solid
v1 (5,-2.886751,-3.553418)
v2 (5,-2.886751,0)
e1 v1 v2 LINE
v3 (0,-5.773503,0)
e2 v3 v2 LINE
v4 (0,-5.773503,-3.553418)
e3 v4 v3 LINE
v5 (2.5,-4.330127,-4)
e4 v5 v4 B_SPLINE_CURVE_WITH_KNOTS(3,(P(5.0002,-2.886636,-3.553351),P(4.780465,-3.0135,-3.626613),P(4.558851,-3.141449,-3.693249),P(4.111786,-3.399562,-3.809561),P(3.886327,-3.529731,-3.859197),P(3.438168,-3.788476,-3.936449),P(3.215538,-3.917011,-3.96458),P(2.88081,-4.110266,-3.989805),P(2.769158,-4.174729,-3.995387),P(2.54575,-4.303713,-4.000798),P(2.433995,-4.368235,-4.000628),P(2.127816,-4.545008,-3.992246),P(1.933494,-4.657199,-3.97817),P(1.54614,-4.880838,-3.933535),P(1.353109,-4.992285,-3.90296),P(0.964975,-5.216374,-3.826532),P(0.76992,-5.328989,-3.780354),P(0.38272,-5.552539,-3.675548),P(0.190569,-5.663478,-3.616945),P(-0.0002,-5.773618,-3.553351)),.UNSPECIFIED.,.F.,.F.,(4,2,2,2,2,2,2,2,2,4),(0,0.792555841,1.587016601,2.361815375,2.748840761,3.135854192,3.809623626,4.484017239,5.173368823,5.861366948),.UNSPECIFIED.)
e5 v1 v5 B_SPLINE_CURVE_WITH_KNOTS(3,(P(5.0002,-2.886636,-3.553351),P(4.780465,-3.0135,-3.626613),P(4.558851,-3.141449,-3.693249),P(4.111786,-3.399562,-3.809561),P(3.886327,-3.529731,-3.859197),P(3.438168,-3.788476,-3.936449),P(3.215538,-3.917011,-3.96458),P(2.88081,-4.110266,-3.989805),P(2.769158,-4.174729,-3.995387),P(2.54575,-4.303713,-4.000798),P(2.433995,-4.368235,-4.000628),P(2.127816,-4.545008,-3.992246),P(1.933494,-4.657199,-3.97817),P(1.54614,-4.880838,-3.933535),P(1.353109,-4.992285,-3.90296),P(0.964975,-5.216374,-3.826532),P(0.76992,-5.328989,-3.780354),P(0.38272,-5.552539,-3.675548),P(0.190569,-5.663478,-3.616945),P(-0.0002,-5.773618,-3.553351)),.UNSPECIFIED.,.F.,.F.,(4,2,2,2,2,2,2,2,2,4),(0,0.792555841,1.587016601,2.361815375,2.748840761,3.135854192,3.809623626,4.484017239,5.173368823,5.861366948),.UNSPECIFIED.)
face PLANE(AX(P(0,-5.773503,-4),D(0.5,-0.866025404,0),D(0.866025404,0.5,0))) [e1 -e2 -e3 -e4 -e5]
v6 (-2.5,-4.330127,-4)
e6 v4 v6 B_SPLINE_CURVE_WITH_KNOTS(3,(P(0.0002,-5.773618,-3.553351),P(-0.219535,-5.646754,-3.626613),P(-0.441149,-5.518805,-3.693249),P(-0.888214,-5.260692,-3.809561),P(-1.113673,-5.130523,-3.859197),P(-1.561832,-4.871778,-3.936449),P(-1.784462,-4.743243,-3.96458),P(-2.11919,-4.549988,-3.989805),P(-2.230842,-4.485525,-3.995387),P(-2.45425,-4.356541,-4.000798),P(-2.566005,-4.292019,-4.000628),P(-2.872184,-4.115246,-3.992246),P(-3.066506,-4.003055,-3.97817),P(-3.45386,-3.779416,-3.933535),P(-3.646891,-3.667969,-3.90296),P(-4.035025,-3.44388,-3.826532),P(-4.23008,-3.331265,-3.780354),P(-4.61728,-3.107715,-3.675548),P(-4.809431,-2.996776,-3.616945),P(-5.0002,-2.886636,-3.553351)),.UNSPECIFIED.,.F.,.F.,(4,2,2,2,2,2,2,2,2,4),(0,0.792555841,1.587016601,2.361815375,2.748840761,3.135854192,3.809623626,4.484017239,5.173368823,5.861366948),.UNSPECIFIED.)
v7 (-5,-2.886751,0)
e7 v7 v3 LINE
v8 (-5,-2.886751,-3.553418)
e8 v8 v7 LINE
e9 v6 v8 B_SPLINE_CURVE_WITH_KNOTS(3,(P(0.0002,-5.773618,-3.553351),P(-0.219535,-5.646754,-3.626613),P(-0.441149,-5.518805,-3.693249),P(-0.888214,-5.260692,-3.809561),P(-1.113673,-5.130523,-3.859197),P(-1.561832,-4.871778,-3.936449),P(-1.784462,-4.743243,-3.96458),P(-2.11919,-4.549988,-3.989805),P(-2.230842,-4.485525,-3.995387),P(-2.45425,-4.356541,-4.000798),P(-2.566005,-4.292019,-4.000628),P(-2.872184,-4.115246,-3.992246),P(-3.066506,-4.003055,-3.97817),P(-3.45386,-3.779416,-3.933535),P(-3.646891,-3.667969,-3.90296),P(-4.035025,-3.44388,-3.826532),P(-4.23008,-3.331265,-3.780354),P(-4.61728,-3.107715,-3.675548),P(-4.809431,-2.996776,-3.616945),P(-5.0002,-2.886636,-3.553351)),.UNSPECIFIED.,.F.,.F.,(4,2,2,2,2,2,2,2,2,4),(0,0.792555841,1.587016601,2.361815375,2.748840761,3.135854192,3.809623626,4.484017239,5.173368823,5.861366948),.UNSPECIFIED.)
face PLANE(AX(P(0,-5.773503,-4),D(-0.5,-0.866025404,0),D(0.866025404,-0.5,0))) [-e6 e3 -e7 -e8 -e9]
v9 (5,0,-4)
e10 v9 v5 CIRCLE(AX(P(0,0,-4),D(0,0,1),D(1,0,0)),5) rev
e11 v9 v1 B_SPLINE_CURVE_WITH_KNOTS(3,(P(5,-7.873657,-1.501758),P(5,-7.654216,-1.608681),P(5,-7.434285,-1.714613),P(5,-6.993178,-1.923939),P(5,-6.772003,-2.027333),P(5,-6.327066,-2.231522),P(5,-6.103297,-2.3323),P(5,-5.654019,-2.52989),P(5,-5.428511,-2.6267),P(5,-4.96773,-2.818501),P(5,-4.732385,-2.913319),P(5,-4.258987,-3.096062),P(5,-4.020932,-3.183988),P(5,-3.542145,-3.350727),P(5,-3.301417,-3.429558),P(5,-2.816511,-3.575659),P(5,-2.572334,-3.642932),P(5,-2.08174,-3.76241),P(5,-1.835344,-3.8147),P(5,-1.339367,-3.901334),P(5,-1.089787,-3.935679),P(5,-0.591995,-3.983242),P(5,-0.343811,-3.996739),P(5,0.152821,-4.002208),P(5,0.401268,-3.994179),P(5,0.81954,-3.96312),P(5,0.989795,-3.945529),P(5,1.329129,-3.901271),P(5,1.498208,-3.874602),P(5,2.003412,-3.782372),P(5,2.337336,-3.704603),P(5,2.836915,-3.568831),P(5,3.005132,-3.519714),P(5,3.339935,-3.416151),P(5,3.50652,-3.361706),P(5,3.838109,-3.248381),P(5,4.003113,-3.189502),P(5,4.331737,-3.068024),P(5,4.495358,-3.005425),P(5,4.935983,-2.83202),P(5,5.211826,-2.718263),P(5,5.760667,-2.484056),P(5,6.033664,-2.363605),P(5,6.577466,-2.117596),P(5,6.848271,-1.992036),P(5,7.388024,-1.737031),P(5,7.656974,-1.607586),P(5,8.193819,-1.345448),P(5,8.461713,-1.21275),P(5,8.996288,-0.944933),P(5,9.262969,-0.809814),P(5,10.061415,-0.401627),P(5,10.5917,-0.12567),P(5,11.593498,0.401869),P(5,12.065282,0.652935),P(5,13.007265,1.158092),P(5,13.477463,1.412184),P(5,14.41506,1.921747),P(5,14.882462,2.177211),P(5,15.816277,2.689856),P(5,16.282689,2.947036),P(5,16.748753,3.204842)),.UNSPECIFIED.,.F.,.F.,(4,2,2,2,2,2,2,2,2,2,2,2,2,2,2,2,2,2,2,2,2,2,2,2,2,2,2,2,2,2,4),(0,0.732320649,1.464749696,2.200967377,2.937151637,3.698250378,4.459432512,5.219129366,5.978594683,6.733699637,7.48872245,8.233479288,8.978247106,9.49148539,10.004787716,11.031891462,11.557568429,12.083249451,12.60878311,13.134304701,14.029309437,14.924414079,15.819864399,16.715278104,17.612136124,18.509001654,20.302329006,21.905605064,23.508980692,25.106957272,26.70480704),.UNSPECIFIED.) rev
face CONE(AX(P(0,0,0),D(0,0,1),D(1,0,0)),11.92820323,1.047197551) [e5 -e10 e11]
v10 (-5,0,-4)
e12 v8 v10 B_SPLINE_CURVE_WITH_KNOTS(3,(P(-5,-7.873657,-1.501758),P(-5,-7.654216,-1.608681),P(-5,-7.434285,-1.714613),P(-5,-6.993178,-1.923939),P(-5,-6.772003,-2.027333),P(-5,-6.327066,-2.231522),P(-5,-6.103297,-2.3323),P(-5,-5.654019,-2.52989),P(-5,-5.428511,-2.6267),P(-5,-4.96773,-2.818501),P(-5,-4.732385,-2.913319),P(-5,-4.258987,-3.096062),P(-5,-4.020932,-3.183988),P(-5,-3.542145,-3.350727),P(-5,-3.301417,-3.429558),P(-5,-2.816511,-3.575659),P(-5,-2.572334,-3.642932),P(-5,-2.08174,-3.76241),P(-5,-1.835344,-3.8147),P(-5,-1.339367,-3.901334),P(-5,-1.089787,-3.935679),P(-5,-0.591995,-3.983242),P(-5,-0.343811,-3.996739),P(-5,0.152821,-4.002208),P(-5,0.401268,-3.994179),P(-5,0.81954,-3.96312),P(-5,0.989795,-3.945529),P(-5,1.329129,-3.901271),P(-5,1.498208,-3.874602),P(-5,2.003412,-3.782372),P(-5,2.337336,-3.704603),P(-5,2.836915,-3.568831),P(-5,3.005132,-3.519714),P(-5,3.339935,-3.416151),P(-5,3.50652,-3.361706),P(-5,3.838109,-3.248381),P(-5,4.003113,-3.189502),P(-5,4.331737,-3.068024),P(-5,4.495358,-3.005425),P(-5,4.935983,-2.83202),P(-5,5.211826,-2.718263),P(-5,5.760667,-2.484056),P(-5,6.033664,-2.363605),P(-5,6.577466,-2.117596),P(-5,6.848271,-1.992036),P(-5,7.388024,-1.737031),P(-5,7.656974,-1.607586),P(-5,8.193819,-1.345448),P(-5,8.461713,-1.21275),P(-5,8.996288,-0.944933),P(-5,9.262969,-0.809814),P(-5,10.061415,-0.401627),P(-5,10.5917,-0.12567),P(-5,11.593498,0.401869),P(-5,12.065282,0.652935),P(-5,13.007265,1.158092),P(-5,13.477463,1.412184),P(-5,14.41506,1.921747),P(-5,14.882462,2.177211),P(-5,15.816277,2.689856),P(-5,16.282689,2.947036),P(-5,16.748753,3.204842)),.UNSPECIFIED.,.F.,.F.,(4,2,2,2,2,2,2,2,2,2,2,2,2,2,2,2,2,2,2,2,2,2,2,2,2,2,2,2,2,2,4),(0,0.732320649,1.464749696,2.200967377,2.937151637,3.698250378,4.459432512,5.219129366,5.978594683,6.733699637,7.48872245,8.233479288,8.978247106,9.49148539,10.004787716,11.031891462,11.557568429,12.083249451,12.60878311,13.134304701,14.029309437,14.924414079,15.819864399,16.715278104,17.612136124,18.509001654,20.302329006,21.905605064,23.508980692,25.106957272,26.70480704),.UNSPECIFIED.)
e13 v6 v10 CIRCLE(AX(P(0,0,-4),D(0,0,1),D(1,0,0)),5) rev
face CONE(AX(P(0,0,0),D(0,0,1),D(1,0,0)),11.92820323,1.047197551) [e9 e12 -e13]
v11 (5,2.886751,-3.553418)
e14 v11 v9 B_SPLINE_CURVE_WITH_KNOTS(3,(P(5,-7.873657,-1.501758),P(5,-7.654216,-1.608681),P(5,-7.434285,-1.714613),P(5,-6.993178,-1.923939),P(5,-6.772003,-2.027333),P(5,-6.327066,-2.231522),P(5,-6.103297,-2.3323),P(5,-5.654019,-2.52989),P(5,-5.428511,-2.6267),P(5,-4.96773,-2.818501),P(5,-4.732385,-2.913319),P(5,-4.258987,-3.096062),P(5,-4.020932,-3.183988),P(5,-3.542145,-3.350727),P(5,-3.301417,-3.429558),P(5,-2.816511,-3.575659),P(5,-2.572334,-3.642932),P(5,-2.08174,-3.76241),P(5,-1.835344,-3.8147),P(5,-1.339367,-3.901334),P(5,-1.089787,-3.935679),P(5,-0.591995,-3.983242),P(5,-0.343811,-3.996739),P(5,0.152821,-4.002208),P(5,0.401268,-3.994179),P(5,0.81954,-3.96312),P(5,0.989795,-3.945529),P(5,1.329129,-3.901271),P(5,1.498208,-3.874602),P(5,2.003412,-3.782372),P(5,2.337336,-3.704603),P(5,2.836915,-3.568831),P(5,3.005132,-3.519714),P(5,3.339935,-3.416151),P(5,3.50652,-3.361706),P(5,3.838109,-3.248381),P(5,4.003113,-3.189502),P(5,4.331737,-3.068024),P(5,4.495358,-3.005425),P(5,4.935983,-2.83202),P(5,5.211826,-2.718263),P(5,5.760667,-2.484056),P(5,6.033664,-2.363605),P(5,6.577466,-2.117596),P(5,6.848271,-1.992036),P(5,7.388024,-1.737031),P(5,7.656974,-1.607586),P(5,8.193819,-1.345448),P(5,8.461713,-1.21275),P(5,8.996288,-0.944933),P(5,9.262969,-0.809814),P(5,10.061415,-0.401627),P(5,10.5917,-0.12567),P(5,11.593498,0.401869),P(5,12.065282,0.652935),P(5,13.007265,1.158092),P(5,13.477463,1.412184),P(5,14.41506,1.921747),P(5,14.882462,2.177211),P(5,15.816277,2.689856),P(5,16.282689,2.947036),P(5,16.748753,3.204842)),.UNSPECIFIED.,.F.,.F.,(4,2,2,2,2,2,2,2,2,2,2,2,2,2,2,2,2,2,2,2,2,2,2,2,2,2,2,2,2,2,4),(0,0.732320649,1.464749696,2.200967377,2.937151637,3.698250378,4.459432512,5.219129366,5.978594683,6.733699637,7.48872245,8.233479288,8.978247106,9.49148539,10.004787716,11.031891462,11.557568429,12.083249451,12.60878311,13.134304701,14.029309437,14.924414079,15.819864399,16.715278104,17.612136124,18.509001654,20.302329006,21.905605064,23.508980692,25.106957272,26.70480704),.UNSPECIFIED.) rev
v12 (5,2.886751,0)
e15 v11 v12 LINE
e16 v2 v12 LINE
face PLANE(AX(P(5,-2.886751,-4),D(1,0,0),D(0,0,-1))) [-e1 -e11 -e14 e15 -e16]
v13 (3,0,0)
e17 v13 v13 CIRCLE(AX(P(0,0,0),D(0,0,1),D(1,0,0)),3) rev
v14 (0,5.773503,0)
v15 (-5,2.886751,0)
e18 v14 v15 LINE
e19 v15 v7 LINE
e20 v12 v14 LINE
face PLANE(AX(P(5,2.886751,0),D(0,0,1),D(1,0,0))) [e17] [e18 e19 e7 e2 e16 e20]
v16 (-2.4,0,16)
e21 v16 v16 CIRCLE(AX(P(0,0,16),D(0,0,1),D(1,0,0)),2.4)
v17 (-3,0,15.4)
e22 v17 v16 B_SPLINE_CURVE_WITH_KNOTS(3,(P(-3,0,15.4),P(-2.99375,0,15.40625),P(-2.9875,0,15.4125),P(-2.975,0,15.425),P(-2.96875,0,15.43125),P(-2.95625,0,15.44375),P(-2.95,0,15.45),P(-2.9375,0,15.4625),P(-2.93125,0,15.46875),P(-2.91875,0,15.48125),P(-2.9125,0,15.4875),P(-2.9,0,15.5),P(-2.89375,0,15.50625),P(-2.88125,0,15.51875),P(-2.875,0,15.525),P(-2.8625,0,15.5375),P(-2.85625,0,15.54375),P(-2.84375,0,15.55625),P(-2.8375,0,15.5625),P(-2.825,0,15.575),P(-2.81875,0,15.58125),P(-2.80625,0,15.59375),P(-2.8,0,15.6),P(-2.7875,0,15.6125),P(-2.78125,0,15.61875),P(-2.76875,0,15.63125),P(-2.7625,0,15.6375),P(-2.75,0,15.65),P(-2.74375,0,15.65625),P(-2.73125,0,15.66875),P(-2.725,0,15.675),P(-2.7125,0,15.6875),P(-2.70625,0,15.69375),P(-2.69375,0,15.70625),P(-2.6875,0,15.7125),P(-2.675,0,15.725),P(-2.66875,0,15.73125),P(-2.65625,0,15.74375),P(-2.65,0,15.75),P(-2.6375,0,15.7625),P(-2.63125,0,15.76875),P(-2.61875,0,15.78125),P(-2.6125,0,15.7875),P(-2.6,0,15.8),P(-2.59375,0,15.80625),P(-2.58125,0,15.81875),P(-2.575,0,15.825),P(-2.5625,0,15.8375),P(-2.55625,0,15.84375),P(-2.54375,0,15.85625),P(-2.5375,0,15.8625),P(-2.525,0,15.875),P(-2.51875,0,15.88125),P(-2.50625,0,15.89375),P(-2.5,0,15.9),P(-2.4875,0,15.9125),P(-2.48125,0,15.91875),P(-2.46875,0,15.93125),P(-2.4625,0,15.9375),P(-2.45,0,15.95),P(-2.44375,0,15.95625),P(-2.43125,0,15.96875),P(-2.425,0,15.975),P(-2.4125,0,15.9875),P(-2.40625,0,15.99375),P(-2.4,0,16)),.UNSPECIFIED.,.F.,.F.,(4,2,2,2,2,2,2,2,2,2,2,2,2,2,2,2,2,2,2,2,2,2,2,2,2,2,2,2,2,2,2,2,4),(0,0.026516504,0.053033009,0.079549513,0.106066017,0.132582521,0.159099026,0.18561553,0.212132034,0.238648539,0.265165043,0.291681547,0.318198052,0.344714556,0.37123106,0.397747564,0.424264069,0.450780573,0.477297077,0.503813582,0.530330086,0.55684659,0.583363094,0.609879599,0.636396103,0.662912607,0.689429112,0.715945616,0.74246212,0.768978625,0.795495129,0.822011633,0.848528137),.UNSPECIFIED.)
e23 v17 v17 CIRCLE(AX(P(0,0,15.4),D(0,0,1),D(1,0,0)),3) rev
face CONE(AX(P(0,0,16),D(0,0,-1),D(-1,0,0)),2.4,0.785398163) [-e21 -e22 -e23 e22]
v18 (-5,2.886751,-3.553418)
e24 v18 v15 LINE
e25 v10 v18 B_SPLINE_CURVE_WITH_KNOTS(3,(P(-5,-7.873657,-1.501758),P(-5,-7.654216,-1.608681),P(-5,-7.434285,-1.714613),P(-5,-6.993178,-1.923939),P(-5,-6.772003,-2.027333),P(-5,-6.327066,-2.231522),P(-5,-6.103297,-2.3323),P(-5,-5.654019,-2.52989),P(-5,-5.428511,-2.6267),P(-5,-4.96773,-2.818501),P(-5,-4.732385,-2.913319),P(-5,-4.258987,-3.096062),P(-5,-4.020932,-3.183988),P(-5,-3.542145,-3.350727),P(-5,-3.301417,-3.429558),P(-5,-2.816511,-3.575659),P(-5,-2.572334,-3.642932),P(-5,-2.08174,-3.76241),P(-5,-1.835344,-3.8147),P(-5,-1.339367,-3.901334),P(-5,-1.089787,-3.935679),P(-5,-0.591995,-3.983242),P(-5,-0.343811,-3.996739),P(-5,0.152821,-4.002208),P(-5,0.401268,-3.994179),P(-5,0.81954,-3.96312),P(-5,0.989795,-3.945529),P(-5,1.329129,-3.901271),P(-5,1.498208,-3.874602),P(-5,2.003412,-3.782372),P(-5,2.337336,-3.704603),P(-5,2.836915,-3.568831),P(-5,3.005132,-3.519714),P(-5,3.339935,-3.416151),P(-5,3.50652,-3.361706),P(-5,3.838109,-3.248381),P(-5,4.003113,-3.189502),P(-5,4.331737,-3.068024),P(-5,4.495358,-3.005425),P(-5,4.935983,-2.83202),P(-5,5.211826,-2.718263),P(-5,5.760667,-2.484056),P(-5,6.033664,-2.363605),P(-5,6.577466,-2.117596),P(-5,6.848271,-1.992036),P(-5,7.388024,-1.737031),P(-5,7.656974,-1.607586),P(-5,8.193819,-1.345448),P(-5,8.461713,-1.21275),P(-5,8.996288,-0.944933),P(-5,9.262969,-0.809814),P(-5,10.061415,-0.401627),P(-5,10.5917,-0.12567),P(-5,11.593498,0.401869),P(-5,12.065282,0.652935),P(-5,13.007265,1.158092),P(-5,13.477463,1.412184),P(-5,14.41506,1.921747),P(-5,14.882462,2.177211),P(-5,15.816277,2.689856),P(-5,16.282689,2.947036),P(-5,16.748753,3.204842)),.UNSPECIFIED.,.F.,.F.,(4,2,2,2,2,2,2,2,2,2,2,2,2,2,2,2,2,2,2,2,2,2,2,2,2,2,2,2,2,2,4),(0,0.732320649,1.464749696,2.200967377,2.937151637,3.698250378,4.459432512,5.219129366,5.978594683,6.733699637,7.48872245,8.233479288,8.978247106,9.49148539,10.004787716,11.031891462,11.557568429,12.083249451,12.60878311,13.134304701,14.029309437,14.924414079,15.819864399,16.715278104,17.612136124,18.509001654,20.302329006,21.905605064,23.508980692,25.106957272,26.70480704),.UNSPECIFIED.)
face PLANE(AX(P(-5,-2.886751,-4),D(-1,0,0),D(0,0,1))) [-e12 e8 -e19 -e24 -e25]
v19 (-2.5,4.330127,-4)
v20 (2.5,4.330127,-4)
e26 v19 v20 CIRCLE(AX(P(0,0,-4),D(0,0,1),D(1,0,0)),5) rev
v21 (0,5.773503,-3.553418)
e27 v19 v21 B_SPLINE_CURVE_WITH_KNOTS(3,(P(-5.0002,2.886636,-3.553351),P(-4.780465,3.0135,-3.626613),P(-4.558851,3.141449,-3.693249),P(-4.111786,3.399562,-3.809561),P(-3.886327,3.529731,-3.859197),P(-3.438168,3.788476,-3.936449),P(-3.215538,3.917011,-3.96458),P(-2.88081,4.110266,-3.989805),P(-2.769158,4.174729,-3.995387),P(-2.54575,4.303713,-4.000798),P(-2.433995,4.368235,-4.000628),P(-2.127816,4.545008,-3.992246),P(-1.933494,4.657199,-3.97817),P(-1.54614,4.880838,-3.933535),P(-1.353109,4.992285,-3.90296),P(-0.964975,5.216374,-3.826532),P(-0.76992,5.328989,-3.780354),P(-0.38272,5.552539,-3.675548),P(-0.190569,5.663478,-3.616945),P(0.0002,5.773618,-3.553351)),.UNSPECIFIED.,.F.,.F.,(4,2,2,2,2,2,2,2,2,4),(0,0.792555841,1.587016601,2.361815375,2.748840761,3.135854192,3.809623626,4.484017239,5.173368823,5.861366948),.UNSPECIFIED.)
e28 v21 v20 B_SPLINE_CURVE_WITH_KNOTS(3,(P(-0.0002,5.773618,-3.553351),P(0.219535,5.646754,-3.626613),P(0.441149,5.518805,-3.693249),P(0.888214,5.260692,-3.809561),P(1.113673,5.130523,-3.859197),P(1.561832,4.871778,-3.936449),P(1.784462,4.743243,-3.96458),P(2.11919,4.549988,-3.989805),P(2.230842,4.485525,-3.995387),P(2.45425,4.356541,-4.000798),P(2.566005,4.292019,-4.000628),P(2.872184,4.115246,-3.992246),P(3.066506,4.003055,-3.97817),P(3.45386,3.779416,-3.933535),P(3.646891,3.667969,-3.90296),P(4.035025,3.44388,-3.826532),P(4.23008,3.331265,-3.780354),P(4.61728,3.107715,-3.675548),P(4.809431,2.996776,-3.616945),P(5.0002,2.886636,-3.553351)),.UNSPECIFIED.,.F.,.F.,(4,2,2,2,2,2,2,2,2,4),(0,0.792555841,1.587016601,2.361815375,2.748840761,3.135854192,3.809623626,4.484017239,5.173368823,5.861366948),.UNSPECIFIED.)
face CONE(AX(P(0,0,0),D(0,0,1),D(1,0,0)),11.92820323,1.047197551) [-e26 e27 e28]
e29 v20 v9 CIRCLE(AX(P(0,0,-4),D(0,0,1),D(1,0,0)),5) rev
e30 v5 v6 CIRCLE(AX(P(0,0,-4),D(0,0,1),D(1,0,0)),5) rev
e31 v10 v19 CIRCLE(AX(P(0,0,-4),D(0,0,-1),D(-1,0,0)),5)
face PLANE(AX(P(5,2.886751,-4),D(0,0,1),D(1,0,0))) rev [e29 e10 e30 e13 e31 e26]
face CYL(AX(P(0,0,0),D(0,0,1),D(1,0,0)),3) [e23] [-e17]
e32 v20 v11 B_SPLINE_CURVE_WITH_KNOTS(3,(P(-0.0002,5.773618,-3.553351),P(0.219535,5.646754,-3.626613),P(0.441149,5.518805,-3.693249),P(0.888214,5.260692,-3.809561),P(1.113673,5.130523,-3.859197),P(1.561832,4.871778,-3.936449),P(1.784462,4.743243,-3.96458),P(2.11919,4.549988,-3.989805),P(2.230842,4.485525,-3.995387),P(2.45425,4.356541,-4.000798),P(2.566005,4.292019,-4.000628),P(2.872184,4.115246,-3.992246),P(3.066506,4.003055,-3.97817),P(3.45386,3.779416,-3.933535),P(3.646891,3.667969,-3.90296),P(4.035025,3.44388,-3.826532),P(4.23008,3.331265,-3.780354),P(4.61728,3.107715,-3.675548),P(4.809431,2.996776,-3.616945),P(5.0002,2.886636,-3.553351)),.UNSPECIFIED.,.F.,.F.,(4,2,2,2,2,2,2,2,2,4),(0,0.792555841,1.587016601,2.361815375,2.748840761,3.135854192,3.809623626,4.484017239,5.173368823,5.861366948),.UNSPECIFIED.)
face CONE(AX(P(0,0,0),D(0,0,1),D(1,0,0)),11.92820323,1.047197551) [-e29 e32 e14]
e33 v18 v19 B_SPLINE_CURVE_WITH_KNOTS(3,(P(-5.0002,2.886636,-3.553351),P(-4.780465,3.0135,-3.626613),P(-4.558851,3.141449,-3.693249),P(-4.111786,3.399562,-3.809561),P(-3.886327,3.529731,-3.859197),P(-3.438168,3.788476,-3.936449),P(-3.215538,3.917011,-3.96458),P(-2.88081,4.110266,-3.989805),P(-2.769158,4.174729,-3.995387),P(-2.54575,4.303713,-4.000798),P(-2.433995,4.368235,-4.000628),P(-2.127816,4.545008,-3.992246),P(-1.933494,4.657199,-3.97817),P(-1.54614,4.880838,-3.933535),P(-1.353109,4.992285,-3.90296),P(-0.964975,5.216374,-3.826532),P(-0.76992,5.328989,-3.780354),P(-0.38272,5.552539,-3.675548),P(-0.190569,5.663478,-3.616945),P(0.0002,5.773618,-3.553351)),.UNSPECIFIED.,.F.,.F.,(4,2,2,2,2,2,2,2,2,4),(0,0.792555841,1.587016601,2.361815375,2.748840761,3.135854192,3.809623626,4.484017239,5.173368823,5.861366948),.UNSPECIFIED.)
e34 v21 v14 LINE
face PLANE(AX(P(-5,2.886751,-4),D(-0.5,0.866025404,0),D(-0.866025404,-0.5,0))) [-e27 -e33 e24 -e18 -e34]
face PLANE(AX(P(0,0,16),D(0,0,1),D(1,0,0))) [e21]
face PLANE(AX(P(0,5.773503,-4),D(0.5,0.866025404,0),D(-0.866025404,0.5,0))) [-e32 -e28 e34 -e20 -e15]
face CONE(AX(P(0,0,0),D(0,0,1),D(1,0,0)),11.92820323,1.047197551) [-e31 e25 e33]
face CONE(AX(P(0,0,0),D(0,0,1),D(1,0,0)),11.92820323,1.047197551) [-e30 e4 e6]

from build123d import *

# Parameters (mm, degrees)
ESQUISSE1_W        = 3
ESQUISSE1_H        = 16
BOSS_EXTRU_1_DEPTH = 4


with BuildPart() as part:
    # Esquisse1 → Base-Révolution (revolve)
    with BuildSketch(Plane(origin=(0, 0, 0), x_dir=(1, 0, 0), z_dir=(0, 1, 0))):
        with Locations((1.5, -8)):
            Rectangle(ESQUISSE1_W, ESQUISSE1_H)
    revolve(axis=Axis((0, 0, 0), (0, 0, 1)))

    # Chanfrein1: read off the stored shape, not the designer's step
    # Chanfrein1 outline → Chanfrein1 (revolve, cut)
    with BuildSketch(Plane.XZ):
        Polygon((3, 16), (2.4, 16), (3, 15.4), align=None)
    revolve(axis=Axis((0, 0, 0), (0, 0, 1)), mode=Mode.SUBTRACT)

    # Esquisse6 → Boss.-Extru.1 (add)
    with BuildSketch(Plane.XY):
        Polygon((5, -2.886751346), (5, 2.886751346), (0, 5.773502692), (-5, 2.886751346), (-5, -2.886751346), (0, -5.773502692), align=None)
    extrude(amount=-BOSS_EXTRU_1_DEPTH)

    # Esquisse7 → Enlèvement de matière-Révolution1 (revolve, cut)
    with BuildSketch(Plane(origin=(0, 0, 0), x_dir=(1, 0, 0), z_dir=(0, 1, 0))):
        Polygon((-5, 4), (-11.92820323, 4), (-11.92820323, 0), align=None)
    revolve(axis=Axis((0, 0, -6.239446496), (0, 0, 1)), mode=Mode.SUBTRACT)


solid = part.part
